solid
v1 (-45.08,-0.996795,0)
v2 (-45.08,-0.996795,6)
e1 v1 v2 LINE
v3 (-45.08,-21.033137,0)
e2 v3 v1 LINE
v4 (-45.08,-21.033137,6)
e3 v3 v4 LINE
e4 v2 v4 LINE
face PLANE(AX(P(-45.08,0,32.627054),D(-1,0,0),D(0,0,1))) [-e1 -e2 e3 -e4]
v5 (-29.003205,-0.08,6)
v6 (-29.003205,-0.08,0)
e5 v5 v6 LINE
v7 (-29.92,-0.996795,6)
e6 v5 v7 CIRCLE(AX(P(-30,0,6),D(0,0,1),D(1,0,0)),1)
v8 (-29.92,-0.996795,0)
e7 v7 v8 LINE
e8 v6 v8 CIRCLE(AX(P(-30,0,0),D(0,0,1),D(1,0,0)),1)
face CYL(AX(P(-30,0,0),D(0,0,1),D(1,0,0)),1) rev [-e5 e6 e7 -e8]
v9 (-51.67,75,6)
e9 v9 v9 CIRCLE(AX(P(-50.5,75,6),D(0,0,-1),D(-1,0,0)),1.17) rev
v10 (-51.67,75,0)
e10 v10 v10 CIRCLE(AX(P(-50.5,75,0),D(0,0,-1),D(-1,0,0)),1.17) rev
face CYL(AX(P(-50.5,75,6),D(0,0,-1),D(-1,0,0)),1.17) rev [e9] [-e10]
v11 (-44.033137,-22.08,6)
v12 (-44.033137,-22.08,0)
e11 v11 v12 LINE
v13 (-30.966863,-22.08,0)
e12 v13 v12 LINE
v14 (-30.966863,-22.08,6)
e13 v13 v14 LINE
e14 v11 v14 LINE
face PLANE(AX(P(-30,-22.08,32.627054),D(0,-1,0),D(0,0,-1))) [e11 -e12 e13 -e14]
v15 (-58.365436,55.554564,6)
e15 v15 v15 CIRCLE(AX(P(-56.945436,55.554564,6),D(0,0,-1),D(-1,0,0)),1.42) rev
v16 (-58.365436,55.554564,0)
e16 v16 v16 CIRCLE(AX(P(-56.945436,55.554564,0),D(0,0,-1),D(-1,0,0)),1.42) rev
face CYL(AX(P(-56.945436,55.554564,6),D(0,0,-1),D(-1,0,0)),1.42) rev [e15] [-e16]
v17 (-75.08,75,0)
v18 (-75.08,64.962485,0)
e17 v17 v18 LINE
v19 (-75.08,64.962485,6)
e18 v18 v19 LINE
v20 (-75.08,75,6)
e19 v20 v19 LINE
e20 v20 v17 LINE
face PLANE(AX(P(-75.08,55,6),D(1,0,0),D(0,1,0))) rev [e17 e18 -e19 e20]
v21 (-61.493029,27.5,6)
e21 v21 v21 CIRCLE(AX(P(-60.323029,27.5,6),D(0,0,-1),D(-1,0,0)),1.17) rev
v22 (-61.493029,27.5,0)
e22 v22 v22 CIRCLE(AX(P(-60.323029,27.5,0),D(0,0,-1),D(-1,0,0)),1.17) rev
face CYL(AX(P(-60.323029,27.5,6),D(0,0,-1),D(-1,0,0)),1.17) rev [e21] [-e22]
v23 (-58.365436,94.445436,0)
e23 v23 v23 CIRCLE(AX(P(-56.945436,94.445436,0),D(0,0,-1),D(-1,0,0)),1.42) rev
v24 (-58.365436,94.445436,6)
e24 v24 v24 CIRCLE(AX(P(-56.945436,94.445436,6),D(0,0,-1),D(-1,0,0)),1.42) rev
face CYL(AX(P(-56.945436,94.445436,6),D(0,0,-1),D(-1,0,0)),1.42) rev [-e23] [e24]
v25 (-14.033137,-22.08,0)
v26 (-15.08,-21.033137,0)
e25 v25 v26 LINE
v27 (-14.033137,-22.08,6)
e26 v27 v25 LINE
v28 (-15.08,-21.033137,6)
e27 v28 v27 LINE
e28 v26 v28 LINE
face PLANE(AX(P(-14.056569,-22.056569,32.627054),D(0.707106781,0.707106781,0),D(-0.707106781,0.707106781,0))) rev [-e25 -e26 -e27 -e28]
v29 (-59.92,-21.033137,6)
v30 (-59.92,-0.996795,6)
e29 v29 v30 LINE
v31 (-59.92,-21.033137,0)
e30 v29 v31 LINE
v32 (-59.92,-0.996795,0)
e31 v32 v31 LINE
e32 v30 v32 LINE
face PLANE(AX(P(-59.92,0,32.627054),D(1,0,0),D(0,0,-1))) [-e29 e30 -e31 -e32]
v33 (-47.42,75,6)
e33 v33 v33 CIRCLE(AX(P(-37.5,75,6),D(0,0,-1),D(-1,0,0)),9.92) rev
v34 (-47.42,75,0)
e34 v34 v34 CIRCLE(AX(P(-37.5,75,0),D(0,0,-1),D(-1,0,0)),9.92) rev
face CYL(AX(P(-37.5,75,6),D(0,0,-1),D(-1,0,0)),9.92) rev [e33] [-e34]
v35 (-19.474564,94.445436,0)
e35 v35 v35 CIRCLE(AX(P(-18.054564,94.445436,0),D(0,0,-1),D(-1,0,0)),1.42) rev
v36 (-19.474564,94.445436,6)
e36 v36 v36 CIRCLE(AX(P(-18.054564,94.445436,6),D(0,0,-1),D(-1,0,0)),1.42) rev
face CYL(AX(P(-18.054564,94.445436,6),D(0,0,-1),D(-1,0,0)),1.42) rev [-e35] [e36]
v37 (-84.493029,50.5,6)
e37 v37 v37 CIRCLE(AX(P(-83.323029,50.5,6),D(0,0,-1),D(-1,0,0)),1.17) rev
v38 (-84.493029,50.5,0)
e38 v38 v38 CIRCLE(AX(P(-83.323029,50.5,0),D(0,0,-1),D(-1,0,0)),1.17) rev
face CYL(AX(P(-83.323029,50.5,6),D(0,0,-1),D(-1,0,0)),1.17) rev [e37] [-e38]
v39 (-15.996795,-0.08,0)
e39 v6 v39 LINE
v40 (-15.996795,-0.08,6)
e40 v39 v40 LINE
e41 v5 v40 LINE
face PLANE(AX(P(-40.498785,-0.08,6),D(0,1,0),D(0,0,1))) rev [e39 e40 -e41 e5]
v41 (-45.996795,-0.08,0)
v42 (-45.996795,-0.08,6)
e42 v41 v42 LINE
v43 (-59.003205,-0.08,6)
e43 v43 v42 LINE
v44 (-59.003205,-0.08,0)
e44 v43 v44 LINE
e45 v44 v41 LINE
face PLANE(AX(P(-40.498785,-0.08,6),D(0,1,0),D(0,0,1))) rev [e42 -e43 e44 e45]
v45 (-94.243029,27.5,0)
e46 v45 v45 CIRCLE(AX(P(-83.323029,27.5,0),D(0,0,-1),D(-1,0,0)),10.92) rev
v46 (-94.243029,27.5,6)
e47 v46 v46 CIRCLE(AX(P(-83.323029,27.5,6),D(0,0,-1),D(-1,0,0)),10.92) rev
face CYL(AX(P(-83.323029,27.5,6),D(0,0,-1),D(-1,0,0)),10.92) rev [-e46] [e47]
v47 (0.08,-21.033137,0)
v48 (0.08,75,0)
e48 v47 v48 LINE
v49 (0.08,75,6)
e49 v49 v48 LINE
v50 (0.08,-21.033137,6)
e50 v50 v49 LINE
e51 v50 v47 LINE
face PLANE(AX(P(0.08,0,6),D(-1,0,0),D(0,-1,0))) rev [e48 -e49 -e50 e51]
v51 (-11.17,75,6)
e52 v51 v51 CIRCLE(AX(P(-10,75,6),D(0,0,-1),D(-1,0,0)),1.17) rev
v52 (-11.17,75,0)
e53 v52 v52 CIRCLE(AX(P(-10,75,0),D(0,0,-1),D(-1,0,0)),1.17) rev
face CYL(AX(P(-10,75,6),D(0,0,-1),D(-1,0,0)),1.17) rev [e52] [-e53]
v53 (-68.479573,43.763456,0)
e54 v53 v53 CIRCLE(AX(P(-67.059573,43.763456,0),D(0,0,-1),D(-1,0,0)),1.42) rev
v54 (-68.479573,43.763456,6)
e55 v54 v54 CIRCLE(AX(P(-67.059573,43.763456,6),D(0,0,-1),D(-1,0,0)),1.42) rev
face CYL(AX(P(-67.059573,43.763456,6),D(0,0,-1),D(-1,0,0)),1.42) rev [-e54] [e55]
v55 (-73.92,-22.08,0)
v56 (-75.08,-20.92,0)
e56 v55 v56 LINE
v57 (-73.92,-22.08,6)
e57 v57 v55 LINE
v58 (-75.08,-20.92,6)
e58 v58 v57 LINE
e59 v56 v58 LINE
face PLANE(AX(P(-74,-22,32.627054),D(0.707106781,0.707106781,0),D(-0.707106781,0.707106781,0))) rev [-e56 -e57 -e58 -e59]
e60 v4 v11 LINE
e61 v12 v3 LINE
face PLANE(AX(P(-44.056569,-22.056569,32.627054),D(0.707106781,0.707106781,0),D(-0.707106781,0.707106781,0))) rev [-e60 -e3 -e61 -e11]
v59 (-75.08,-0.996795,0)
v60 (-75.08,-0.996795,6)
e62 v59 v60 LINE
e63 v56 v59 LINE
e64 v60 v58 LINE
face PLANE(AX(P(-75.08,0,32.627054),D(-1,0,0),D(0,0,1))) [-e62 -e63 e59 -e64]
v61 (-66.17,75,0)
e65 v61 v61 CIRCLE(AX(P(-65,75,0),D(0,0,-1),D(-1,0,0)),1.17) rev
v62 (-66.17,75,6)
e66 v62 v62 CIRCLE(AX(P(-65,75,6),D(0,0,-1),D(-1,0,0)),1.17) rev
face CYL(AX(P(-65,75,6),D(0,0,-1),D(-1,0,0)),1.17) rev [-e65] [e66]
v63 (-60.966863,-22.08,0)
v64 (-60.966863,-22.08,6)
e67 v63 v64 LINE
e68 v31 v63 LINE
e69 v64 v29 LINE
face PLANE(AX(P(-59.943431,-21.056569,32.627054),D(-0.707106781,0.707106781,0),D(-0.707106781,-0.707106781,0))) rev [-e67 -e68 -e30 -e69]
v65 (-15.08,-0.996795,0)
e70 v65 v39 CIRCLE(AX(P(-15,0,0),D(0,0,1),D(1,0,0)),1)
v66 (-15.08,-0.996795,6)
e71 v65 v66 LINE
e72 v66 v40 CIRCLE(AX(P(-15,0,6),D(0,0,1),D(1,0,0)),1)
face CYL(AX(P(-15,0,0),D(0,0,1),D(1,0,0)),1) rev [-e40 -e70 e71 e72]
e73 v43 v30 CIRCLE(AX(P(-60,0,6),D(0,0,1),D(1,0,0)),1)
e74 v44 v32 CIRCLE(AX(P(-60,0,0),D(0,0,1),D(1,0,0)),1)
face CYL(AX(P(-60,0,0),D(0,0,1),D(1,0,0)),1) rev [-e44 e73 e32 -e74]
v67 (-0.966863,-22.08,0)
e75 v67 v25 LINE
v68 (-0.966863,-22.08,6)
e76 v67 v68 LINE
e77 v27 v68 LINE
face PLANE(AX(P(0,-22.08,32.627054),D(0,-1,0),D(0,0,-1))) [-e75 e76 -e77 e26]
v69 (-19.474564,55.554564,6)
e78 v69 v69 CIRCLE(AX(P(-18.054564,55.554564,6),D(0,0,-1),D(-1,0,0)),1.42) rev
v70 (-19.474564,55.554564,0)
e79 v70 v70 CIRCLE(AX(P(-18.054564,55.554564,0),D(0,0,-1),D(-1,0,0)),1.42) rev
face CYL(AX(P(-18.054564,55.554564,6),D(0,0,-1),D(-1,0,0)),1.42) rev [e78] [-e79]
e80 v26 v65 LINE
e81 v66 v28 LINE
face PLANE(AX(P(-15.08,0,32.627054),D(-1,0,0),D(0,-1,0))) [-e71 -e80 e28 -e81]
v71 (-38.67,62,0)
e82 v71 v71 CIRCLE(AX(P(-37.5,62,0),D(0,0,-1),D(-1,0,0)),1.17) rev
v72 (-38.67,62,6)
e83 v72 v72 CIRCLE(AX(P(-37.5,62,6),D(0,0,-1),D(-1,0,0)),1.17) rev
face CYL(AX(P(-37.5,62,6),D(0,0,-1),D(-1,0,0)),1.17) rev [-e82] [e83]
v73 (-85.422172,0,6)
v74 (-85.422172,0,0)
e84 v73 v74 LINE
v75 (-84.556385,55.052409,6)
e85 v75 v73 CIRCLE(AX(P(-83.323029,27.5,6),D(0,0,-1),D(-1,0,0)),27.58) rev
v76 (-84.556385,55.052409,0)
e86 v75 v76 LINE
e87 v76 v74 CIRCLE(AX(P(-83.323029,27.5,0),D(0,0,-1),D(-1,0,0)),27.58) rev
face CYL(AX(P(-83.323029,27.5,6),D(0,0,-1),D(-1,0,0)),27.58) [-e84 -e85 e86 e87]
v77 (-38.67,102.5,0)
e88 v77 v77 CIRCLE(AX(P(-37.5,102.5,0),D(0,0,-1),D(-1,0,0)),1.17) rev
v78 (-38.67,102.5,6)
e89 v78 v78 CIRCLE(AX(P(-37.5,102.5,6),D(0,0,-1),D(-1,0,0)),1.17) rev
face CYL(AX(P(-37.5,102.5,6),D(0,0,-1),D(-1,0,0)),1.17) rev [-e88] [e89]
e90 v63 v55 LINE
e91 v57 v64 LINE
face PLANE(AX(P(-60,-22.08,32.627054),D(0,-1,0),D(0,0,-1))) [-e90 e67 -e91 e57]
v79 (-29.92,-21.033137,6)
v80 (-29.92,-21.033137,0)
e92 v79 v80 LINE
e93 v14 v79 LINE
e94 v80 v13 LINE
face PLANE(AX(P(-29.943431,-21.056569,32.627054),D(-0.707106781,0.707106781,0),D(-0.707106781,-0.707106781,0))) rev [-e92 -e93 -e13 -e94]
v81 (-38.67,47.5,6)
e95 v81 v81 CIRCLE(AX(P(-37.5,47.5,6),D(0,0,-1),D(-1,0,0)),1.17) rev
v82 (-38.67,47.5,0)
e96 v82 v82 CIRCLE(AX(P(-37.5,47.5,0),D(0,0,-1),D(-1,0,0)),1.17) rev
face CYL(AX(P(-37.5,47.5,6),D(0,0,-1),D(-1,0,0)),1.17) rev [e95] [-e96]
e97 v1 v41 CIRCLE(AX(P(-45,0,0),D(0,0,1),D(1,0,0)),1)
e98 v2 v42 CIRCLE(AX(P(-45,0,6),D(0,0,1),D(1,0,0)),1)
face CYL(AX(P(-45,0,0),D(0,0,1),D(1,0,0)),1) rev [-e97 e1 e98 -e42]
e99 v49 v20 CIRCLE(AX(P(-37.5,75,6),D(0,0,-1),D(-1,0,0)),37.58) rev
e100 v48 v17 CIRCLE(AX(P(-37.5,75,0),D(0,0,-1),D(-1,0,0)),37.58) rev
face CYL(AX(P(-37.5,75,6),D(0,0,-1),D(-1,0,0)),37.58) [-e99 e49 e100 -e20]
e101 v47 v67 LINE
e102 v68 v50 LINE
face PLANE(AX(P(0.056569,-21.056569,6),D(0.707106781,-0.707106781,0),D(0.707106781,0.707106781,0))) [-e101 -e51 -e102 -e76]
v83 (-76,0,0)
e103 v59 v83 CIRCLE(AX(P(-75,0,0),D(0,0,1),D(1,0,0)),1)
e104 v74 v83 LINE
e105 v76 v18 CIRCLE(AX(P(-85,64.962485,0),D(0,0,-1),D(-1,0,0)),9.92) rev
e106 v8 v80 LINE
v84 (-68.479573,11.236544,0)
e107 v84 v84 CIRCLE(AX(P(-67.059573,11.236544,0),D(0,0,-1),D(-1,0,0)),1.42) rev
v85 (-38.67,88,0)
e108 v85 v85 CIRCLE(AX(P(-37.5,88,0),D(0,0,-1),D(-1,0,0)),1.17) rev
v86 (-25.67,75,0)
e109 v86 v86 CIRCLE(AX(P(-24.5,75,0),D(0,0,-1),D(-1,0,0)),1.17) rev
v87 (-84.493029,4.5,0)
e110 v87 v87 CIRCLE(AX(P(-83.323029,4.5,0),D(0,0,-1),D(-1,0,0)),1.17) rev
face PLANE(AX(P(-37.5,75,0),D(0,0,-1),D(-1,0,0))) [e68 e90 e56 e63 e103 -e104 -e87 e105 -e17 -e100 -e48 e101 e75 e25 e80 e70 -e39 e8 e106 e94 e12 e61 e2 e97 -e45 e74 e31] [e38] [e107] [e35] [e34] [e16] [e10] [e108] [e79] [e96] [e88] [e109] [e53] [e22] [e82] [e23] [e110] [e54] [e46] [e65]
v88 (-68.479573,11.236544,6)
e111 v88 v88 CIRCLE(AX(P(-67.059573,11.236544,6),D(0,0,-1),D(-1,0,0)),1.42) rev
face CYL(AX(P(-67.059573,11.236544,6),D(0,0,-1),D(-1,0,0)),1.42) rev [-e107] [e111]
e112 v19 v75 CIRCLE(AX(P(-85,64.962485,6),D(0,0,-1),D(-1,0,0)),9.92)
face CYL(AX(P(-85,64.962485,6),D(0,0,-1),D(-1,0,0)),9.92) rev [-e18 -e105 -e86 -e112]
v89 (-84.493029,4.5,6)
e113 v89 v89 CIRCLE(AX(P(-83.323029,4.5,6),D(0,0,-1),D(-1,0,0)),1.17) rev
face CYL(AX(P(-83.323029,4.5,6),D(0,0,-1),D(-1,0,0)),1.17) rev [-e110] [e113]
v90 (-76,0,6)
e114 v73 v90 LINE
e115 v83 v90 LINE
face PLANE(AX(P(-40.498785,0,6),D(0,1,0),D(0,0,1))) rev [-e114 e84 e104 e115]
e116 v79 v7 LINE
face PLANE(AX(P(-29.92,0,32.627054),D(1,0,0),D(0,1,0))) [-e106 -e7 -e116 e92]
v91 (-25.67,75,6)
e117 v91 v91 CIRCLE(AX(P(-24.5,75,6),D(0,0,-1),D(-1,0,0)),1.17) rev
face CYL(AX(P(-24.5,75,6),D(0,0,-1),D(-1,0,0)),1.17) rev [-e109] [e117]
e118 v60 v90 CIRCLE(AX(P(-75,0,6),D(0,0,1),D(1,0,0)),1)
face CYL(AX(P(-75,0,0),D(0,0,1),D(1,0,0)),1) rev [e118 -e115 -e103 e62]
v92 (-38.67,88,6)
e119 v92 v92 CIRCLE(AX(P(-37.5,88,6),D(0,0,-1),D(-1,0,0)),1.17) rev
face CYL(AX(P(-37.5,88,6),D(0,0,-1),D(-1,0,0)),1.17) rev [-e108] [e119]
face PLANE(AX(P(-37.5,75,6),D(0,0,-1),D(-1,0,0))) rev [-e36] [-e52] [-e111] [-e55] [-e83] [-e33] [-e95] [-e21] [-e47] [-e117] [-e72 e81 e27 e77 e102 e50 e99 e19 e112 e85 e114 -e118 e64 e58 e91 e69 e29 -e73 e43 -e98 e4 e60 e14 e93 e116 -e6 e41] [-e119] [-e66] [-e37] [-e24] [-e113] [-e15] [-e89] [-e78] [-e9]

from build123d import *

# Parameters (mm, degrees)
SKETCH1_R              = 11
SKETCH1_R_2            = 10
SKETCH1_R_3            = 1.25
SKETCH1_R_4            = 1.5
BOSS_EXTRUDE1_DEPTH    = 6
SKETCH2_W              = 15
SKETCH2_H              = 22
BOSS_EXTRUDE2_DEPTH    = 6
CHAMFER1_SIZE          = 1
SKETCH3_R              = 1
CUT_EXTRUDE1_DEPTH     = 159.031622749
FILLET1_R              = 10
MOVE_FACE1_OUTLINE_R   = 11
MOVE_FACE1_OUTLINE_R_2 = 10.92
MOVE_FACE1_OUTLINE_R_3 = 10
MOVE_FACE1_OUTLINE_R_4 = 9.92
MOVE_FACE1_OUTLINE_R_5 = 1.25
MOVE_FACE1_OUTLINE_R_6 = 1.17
MOVE_FACE1_OUTLINE_R_7 = 1.5
MOVE_FACE1_OUTLINE_R_8 = 1.42
MOVE_FACE1_DEPTH       = 6


# Read off the part's stored shape, not the designer's step: Move Face1
with BuildPart() as part:
    # Sketch1 → Boss-Extrude1 (new body)
    with BuildSketch(Plane.XY):
        with BuildLine():
            Line((-40.498784978, 0), (0, 0))
            Line((0, 0), (0, 75))
            ThreePointArc((0, 75), (-37.5, 112.5), (-75, 75))
            Line((-75, 75), (-75, 55))
            Line((-75, 55), (-83.323029145, 55))
            ThreePointArc((-83.323029145, 55), (-110.823029145, 27.5), (-83.323029145, 0))
            Line((-83.323029145, 0), (-40.498784978, 0))
        make_face()
        with Locations((-83.323029145, 27.5)):
            Circle(SKETCH1_R, mode=Mode.SUBTRACT)
        with Locations((-37.5, 75)):
            Circle(SKETCH1_R_2, mode=Mode.SUBTRACT)
        with Locations((-83.323029145, 50.5)):
            Circle(SKETCH1_R_3, mode=Mode.SUBTRACT)
        with Locations((-67.059573177, 43.763455967)):
            Circle(SKETCH1_R_4, mode=Mode.SUBTRACT)
        with Locations((-37.5, 102.5)):
            Circle(SKETCH1_R_3, mode=Mode.SUBTRACT)
        with Locations((-10, 75)):
            Circle(SKETCH1_R_3, mode=Mode.SUBTRACT)
        with Locations((-37.5, 47.5)):
            Circle(SKETCH1_R_3, mode=Mode.SUBTRACT)
        with Locations((-65, 75)):
            Circle(SKETCH1_R_3, mode=Mode.SUBTRACT)
        with Locations((-56.945436483, 94.445436483)):
            Circle(SKETCH1_R_4, mode=Mode.SUBTRACT)
        with Locations((-60.323029145, 27.5)):
            Circle(SKETCH1_R_3, mode=Mode.SUBTRACT)
        with Locations((-67.059573177, 11.236544033)):
            Circle(SKETCH1_R_4, mode=Mode.SUBTRACT)
        with Locations((-83.323029145, 4.5)):
            Circle(SKETCH1_R_3, mode=Mode.SUBTRACT)
        with Locations((-18.054563517, 94.445436483)):
            Circle(SKETCH1_R_4, mode=Mode.SUBTRACT)
        with Locations((-18.054563517, 55.554563517)):
            Circle(SKETCH1_R_4, mode=Mode.SUBTRACT)
        with Locations((-56.945436483, 55.554563517)):
            Circle(SKETCH1_R_4, mode=Mode.SUBTRACT)
        with Locations((-37.5, 88)):
            Circle(SKETCH1_R_3, mode=Mode.SUBTRACT)
        with Locations((-50.5, 75)):
            Circle(SKETCH1_R_3, mode=Mode.SUBTRACT)
        with Locations((-37.5, 62)):
            Circle(SKETCH1_R_3, mode=Mode.SUBTRACT)
        with Locations((-24.5, 75)):
            Circle(SKETCH1_R_3, mode=Mode.SUBTRACT)
    extrude(amount=BOSS_EXTRUDE1_DEPTH)

    # Sketch2 → Boss-Extrude2 (add)
    with BuildSketch(Plane(origin=(0, 0, 0), x_dir=(-1, 0, 0), z_dir=(0, 0, -1))):
        with Locations((7.5, -11)):
            Rectangle(SKETCH2_W, SKETCH2_H)
        with Locations((37.5, -11)):
            Rectangle(SKETCH2_W, SKETCH2_H)
        with Locations((67.5, -11)):
            Rectangle(SKETCH2_W, SKETCH2_H)
    extrude(amount=-BOSS_EXTRUDE2_DEPTH)

    # Chamfer1
    chamfer1_edges = [part.edges().sort_by_distance(p)[0] for p in [
        (0, -22, 3),
        (-15, -22, 3),
        (-30, -22, 3),
        (-45, -22, 3),
        (-60, -22, 3),
        (-75, -22, 3),
    ]]
    chamfer(chamfer1_edges, length=CHAMFER1_SIZE)

    # Sketch3 → Cut-Extrude1 (cut, through all)
    with BuildSketch(Plane.XY.offset(6)):
        with Locations((-75, 0)):
            Circle(SKETCH3_R)
        with Locations((-60, 0)):
            Circle(SKETCH3_R)
        with Locations((-45, 0)):
            Circle(SKETCH3_R)
        with Locations((-30, 0)):
            Circle(SKETCH3_R)
        with Locations((-15, 0)):
            Circle(SKETCH3_R)
    extrude(amount=-CUT_EXTRUDE1_DEPTH, mode=Mode.SUBTRACT)

    # Fillet1
    fillet1_edges = [part.edges().sort_by_distance(p)[0] for p in [
        (-75, 55, 3),
    ]]
    fillet(fillet1_edges, radius=FILLET1_R)

    # Move Face1 outline → Move Face1 (add)
    # profile 1 of 25: a face of its own
    with BuildSketch(Plane.XY):
        with BuildLine():
            Line((-59.003205136, -0.08), (-45.996794864, -0.08))
            ThreePointArc((-45.996794864, -0.08), (-45.999198395, -0.04003209), (-46, 0))
            Line((-46, 0), (-59, 0))
            ThreePointArc((-59, 0), (-59.000801605, -0.04003209), (-59.003205136, -0.08))
        make_face()
    # profile 2 of 25: a face of its own
    with BuildSketch(Plane.XY):
        with BuildLine():
            Line((-45, -21), (-45, -1))
            ThreePointArc((-45, -1), (-45.04003209, -0.999198395), (-45.08, -0.996794864))
            Line((-45.08, -0.996794864), (-45.08, -21.033137085))
            Line((-45.08, -21.033137085), (-44.033137085, -22.08))
            Line((-44.033137085, -22.08), (-30.966862915, -22.08))
            Line((-30.966862915, -22.08), (-29.92, -21.033137085))
            Line((-29.92, -21.033137085), (-29.92, -0.996794864))
            ThreePointArc((-29.92, -0.996794864), (-29.95996791, -0.999198395), (-30, -1))
            Line((-30, -1), (-30, -21))
            Line((-30, -21), (-31, -22))
            Line((-31, -22), (-44, -22))
            Line((-44, -22), (-45, -21))
        make_face()
    # profile 3 of 25: a face of its own
    with BuildSketch(Plane.XY):
        with BuildLine():
            ThreePointArc((-59.92, -0.996794864), (-59.95996791, -0.999198395), (-60, -1))
            Line((-60, -1), (-60, -21))
            Line((-60, -21), (-61, -22))
            Line((-61, -22), (-74, -22))
            Line((-74, -22), (-73.92, -22.08))
            Line((-73.92, -22.08), (-60.966862915, -22.08))
            Line((-60.966862915, -22.08), (-59.92, -21.033137085))
            Line((-59.92, -21.033137085), (-59.92, -0.996794864))
        make_face()
    # profile 4 of 25: a face of its own
    with BuildSketch(Plane.XY):
        with BuildLine():
            Line((-75.08, -20.92), (-75, -21))
            Line((-75, -21), (-75, -1))
            ThreePointArc((-75, -1), (-75.04003209, -0.999198395), (-75.08, -0.996794864))
            Line((-75.08, -0.996794864), (-75.08, -20.92))
        make_face()
    # profile 5 of 25: a face of its own
    with BuildSketch(Plane.XY):
        with BuildLine():
            Line((-16, 0), (-29, 0))
            ThreePointArc((-29, 0), (-29.000801605, -0.04003209), (-29.003205136, -0.08))
            Line((-29.003205136, -0.08), (-15.996794864, -0.08))
            ThreePointArc((-15.996794864, -0.08), (-15.999198395, -0.04003209), (-16, 0))
        make_face()
    # profile 6 of 25: a face of its own
    with BuildSketch(Plane.XY):
        with BuildLine():
            Line((-85.422171827, 0), (-83.323029145, 0))
            ThreePointArc((-83.323029145, 0), (-110.816150501, 26.884956844), (-84.552807772, 54.972488867))
            ThreePointArc((-84.552807772, 54.972488867), (-77.772555006, 58.051331596), (-75, 64.962484818))
            Line((-75, 64.962484818), (-75, 75))
            ThreePointArc((-75, 75), (-37.5, 112.5), (0, 75))
            Line((0, 75), (0, -21))
            Line((0, -21), (-1, -22))
            Line((-1, -22), (-14, -22))
            Line((-14, -22), (-15, -21))
            Line((-15, -21), (-15, -1))
            ThreePointArc((-15, -1), (-15.04003209, -0.999198395), (-15.08, -0.996794864))
            Line((-15.08, -0.996794864), (-15.08, -21.033137085))
            Line((-15.08, -21.033137085), (-14.033137085, -22.08))
            Line((-14.033137085, -22.08), (-0.966862915, -22.08))
            Line((-0.966862915, -22.08), (0.08, -21.033137085))
            Line((0.08, -21.033137085), (0.08, 75))
            ThreePointArc((0.08, 75), (-37.5, 112.58), (-75.08, 75))
            Line((-75.08, 75), (-75.08, 64.962484818))
            ThreePointArc((-75.08, 64.962484818), (-77.830374566, 58.106620822), (-84.55638531, 55.052408834))
            ThreePointArc((-84.55638531, 55.052408834), (-110.899619158, 27.933685652), (-85.422171827, 0))
        make_face()
    # profile 7 of 25: a face of its own
    with BuildSketch(Plane.XY):
        with Locations((-83.323029145, 27.5)):
            Circle(MOVE_FACE1_OUTLINE_R)
        with Locations((-83.323029145, 27.5)):
            Circle(MOVE_FACE1_OUTLINE_R_2, mode=Mode.SUBTRACT)
    # profile 8 of 25: a face of its own
    with BuildSketch(Plane.XY):
        with Locations((-37.5, 75)):
            Circle(MOVE_FACE1_OUTLINE_R_3)
        with Locations((-37.5, 75)):
            Circle(MOVE_FACE1_OUTLINE_R_4, mode=Mode.SUBTRACT)
    # profile 9 of 25: a face of its own
    with BuildSketch(Plane.XY):
        with Locations((-83.323029145, 50.5)):
            Circle(MOVE_FACE1_OUTLINE_R_5)
        with Locations((-83.323029145, 50.5)):
            Circle(MOVE_FACE1_OUTLINE_R_6, mode=Mode.SUBTRACT)
    # profile 10 of 25: a face of its own
    with BuildSketch(Plane.XY):
        with Locations((-67.059573177, 43.763455967)):
            Circle(MOVE_FACE1_OUTLINE_R_7)
        with Locations((-67.059573177, 43.763455967)):
            Circle(MOVE_FACE1_OUTLINE_R_8, mode=Mode.SUBTRACT)
    # profile 11 of 25: a face of its own
    with BuildSketch(Plane.XY):
        with Locations((-37.5, 102.5)):
            Circle(MOVE_FACE1_OUTLINE_R_5)
        with Locations((-37.5, 102.5)):
            Circle(MOVE_FACE1_OUTLINE_R_6, mode=Mode.SUBTRACT)
    # profile 12 of 25: a face of its own
    with BuildSketch(Plane.XY):
        with Locations((-10, 75)):
            Circle(MOVE_FACE1_OUTLINE_R_5)
        with Locations((-10, 75)):
            Circle(MOVE_FACE1_OUTLINE_R_6, mode=Mode.SUBTRACT)
    # profile 13 of 25: a face of its own
    with BuildSketch(Plane.XY):
        with Locations((-37.5, 47.5)):
            Circle(MOVE_FACE1_OUTLINE_R_5)
        with Locations((-37.5, 47.5)):
            Circle(MOVE_FACE1_OUTLINE_R_6, mode=Mode.SUBTRACT)
    # profile 14 of 25: a face of its own
    with BuildSketch(Plane.XY):
        with Locations((-65, 75)):
            Circle(MOVE_FACE1_OUTLINE_R_5)
        with Locations((-65, 75)):
            Circle(MOVE_FACE1_OUTLINE_R_6, mode=Mode.SUBTRACT)
    # profile 15 of 25: a face of its own
    with BuildSketch(Plane.XY):
        with Locations((-56.945436483, 94.445436483)):
            Circle(MOVE_FACE1_OUTLINE_R_7)
        with Locations((-56.945436483, 94.445436483)):
            Circle(MOVE_FACE1_OUTLINE_R_8, mode=Mode.SUBTRACT)
    # profile 16 of 25: a face of its own
    with BuildSketch(Plane.XY):
        with Locations((-37.5, 88)):
            Circle(MOVE_FACE1_OUTLINE_R_5)
        with Locations((-37.5, 88)):
            Circle(MOVE_FACE1_OUTLINE_R_6, mode=Mode.SUBTRACT)
    # profile 17 of 25: a face of its own
    with BuildSketch(Plane.XY):
        with Locations((-60.323029145, 27.5)):
            Circle(MOVE_FACE1_OUTLINE_R_5)
        with Locations((-60.323029145, 27.5)):
            Circle(MOVE_FACE1_OUTLINE_R_6, mode=Mode.SUBTRACT)
    # profile 18 of 25: a face of its own
    with BuildSketch(Plane.XY):
        with Locations((-67.059573177, 11.236544033)):
            Circle(MOVE_FACE1_OUTLINE_R_7)
        with Locations((-67.059573177, 11.236544033)):
            Circle(MOVE_FACE1_OUTLINE_R_8, mode=Mode.SUBTRACT)
    # profile 19 of 25: a face of its own
    with BuildSketch(Plane.XY):
        with Locations((-83.323029145, 4.5)):
            Circle(MOVE_FACE1_OUTLINE_R_5)
        with Locations((-83.323029145, 4.5)):
            Circle(MOVE_FACE1_OUTLINE_R_6, mode=Mode.SUBTRACT)
    # profile 20 of 25: a face of its own
    with BuildSketch(Plane.XY):
        with Locations((-18.054563517, 94.445436483)):
            Circle(MOVE_FACE1_OUTLINE_R_7)
        with Locations((-18.054563517, 94.445436483)):
            Circle(MOVE_FACE1_OUTLINE_R_8, mode=Mode.SUBTRACT)
    # profile 21 of 25: a face of its own
    with BuildSketch(Plane.XY):
        with Locations((-18.054563517, 55.554563517)):
            Circle(MOVE_FACE1_OUTLINE_R_7)
        with Locations((-18.054563517, 55.554563517)):
            Circle(MOVE_FACE1_OUTLINE_R_8, mode=Mode.SUBTRACT)
    # profile 22 of 25: a face of its own
    with BuildSketch(Plane.XY):
        with Locations((-56.945436483, 55.554563517)):
            Circle(MOVE_FACE1_OUTLINE_R_7)
        with Locations((-56.945436483, 55.554563517)):
            Circle(MOVE_FACE1_OUTLINE_R_8, mode=Mode.SUBTRACT)
    # profile 23 of 25: a face of its own
    with BuildSketch(Plane.XY):
        with Locations((-50.5, 75)):
            Circle(MOVE_FACE1_OUTLINE_R_5)
        with Locations((-50.5, 75)):
            Circle(MOVE_FACE1_OUTLINE_R_6, mode=Mode.SUBTRACT)
    # profile 24 of 25: a face of its own
    with BuildSketch(Plane.XY):
        with Locations((-37.5, 62)):
            Circle(MOVE_FACE1_OUTLINE_R_5)
        with Locations((-37.5, 62)):
            Circle(MOVE_FACE1_OUTLINE_R_6, mode=Mode.SUBTRACT)
    # profile 25 of 25: a face of its own
    with BuildSketch(Plane.XY):
        with Locations((-24.5, 75)):
            Circle(MOVE_FACE1_OUTLINE_R_5)
        with Locations((-24.5, 75)):
            Circle(MOVE_FACE1_OUTLINE_R_6, mode=Mode.SUBTRACT)
    extrude(amount=MOVE_FACE1_DEPTH)


solid = part.part
